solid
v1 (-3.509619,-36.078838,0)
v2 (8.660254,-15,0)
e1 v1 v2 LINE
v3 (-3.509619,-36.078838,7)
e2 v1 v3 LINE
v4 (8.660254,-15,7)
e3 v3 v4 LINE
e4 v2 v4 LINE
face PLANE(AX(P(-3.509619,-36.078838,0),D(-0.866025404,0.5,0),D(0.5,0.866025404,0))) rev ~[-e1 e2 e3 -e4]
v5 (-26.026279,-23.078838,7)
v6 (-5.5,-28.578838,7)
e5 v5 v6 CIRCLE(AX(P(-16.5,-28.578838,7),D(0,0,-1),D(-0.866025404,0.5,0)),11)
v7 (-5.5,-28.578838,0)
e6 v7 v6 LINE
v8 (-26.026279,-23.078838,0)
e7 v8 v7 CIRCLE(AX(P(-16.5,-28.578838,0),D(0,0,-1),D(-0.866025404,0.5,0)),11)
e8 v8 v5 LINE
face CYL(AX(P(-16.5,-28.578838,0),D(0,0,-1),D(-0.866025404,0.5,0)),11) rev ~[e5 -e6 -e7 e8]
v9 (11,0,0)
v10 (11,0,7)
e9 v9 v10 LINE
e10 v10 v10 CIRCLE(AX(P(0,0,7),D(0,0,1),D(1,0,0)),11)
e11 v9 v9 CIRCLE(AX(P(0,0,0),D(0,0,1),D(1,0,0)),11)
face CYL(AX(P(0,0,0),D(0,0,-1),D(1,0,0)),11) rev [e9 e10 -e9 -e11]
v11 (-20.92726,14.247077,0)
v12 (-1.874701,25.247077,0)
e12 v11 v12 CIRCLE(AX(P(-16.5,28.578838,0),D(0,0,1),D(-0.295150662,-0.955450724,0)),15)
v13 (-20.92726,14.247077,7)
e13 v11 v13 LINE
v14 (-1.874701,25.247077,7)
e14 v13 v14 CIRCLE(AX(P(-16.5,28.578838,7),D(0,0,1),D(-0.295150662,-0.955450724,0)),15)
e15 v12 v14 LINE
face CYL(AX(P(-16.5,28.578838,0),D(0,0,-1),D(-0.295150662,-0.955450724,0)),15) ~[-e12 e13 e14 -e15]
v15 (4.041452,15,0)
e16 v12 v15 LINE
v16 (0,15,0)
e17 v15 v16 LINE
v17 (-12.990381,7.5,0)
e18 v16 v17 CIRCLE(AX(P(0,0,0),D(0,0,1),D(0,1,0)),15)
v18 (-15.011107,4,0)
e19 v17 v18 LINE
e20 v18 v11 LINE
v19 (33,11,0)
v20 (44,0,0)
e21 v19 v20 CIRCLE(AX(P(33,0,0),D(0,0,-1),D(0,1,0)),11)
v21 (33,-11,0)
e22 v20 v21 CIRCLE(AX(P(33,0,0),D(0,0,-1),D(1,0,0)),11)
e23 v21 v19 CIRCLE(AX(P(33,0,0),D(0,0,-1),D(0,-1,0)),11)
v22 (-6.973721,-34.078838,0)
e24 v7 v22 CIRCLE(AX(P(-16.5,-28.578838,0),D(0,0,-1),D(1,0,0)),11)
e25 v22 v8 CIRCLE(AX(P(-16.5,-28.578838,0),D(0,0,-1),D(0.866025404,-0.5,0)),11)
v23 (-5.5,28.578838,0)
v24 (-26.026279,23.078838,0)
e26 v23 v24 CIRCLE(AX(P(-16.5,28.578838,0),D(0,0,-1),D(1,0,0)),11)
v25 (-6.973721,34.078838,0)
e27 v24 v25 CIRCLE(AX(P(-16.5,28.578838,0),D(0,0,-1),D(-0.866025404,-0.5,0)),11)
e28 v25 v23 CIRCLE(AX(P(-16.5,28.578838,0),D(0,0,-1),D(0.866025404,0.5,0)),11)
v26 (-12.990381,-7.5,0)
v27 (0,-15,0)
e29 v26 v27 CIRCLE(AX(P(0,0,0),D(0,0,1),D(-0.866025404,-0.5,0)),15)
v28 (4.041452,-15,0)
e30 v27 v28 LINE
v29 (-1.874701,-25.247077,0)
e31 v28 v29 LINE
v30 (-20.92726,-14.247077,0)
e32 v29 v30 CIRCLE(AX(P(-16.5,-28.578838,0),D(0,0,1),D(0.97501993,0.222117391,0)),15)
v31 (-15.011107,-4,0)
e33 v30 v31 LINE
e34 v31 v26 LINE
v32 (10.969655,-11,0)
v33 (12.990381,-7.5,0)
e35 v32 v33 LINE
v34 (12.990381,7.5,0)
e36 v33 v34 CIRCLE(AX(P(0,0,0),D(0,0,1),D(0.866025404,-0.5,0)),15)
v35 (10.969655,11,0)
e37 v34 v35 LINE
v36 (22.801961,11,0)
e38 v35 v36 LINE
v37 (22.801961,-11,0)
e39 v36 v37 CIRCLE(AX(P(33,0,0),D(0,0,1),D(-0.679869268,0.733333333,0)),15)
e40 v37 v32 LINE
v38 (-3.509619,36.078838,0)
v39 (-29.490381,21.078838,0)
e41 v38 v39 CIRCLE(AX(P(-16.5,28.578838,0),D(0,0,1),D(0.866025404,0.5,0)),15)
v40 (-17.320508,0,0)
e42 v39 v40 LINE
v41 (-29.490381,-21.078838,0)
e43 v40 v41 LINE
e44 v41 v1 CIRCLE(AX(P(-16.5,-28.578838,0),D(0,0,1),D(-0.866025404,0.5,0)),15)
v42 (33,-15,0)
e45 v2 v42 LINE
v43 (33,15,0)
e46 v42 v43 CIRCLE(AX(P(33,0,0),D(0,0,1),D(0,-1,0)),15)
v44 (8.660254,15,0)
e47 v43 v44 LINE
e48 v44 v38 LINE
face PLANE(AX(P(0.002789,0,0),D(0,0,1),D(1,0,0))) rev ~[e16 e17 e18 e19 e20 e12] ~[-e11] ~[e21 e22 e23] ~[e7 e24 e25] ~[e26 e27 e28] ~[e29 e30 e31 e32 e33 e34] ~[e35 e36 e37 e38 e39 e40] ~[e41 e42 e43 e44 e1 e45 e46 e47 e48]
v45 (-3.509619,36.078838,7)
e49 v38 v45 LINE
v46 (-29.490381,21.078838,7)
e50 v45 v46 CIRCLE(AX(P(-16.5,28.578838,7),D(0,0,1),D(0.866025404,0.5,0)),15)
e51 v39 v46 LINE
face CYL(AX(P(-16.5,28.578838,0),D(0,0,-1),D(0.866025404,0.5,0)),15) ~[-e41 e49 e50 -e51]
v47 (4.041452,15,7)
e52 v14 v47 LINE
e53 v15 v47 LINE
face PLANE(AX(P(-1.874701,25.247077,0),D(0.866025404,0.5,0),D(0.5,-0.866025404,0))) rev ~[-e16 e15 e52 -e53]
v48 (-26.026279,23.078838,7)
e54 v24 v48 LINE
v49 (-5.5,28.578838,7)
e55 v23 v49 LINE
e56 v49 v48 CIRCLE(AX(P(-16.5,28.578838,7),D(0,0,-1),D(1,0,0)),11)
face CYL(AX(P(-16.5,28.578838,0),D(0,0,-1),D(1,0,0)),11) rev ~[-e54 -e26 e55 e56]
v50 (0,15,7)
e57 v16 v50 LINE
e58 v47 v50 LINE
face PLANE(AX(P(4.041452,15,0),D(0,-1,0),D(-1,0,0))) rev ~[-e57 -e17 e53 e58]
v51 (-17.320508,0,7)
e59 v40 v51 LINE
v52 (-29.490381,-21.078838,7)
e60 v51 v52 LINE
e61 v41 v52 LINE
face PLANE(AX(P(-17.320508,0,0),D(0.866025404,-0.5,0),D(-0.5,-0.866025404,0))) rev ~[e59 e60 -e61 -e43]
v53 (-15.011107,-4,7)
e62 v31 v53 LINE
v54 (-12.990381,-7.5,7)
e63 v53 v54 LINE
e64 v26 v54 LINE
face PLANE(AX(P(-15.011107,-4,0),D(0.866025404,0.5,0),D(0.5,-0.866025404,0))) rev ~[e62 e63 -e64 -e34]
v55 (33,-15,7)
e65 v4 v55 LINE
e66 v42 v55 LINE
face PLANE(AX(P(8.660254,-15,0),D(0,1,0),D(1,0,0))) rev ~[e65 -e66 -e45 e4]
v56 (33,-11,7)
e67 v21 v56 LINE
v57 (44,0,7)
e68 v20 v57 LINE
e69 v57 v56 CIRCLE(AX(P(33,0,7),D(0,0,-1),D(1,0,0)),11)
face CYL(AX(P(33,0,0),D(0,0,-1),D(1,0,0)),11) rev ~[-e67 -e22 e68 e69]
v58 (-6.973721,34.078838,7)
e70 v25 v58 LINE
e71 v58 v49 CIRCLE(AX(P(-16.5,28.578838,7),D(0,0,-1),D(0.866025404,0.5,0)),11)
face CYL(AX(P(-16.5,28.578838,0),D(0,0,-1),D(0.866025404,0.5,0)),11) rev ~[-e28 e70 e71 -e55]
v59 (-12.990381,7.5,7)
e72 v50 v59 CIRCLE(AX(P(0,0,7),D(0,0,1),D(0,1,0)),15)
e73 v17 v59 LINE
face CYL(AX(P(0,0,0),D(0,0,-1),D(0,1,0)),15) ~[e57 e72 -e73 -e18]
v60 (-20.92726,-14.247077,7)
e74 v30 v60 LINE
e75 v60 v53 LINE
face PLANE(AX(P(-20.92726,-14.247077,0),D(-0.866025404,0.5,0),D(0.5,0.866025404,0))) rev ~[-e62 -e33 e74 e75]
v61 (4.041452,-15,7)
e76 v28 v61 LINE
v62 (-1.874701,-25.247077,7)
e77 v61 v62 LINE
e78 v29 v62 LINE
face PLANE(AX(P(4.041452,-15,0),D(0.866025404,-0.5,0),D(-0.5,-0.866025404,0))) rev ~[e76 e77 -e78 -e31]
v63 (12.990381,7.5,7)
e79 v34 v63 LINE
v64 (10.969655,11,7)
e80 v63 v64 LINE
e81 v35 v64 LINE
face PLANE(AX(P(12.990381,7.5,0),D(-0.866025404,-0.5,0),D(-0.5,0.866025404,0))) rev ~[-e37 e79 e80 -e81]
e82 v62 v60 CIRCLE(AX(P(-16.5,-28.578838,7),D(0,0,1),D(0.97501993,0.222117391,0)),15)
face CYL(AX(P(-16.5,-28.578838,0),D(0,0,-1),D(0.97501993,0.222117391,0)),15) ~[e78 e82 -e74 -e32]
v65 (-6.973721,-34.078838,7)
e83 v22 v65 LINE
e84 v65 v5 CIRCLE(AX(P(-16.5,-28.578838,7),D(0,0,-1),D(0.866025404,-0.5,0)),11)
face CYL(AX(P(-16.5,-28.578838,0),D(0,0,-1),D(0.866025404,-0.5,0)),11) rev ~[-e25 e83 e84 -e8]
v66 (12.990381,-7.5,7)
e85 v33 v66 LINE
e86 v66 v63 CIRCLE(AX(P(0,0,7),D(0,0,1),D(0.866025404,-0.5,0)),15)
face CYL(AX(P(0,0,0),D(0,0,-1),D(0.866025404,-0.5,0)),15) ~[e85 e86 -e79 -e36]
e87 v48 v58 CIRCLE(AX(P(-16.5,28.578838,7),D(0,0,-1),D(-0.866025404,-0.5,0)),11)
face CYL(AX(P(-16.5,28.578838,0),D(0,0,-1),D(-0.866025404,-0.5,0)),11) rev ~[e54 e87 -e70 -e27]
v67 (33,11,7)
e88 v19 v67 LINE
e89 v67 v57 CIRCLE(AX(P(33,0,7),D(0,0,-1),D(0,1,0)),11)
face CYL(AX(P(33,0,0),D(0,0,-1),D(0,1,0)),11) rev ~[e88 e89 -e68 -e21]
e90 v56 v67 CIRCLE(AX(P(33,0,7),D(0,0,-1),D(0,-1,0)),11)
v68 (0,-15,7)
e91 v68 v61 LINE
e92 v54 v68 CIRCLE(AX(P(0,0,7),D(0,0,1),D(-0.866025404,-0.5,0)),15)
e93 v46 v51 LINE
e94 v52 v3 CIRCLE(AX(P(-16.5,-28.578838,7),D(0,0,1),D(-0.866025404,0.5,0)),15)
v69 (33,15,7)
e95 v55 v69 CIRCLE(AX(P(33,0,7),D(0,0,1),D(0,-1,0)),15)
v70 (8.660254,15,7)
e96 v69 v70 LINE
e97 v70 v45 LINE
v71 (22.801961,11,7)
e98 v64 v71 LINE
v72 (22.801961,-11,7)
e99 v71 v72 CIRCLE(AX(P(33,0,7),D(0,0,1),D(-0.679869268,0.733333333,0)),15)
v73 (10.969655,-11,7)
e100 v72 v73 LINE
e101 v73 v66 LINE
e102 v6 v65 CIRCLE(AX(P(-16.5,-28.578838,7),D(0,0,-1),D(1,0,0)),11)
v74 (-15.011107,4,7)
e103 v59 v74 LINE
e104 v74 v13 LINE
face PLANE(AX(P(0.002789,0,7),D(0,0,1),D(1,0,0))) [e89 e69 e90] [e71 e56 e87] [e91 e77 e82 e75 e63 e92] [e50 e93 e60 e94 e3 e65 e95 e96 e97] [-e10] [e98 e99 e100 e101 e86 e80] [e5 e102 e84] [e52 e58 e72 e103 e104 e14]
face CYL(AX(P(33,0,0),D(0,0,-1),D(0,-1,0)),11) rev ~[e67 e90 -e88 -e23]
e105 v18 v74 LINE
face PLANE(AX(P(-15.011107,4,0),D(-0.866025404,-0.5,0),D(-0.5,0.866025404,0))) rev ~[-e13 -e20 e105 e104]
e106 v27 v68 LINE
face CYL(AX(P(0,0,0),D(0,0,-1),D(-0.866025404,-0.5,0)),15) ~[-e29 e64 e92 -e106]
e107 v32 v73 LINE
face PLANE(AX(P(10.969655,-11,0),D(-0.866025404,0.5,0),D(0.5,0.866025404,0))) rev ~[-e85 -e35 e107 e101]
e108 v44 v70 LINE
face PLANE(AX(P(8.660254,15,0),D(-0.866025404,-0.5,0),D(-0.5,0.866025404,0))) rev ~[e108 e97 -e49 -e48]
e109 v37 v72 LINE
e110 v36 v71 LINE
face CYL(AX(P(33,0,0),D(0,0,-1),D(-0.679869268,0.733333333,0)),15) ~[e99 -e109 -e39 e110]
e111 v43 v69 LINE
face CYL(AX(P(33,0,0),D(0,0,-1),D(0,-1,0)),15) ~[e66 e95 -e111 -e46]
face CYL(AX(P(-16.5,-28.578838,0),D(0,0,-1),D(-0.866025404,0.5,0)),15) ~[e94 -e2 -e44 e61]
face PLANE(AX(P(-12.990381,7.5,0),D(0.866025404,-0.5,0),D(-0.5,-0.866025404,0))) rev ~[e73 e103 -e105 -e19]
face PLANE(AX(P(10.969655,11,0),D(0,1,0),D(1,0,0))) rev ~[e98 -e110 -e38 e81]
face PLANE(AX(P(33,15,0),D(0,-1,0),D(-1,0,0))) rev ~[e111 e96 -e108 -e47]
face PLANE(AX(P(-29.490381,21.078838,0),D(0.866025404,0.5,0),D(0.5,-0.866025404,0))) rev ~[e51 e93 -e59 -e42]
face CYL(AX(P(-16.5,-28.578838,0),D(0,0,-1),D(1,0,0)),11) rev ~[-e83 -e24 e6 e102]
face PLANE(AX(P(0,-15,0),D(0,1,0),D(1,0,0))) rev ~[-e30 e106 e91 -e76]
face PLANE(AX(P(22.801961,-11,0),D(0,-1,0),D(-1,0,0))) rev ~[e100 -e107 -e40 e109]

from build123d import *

# Parameters (mm, degrees)
F0_R     = 11
F1_DEPTH = 7


# Not quite as in the source:
# - a feature names something its author has since deleted; it is built from what else it names


with BuildPart() as f1:
    # F0 (on Top) → F1 (new body)
    with BuildSketch(Plane.XY):
        with BuildLine():
            Line((-15.0111069989, -4), (-12.9903810568, -7.5))
            ThreePointArc((-12.9903810568, -7.5), (-7.5, -12.9903810568), (0, -15))
            Line((0, -15), (4.0414518843, -15))
            Line((4.0414518843, -15), (-1.8747010448, -25.2470774586))
            ThreePointArc((-1.8747010448, -25.2470774586), (-1.5939696041, -26.9024559592), (-1.5, -28.5788383249))
            ThreePointArc((-1.5, -28.5788383249), (-2.0111126057, -32.4611240014), (-3.5096189432, -36.0788383249))
            Line((-3.5096189432, -36.0788383249), (8.6602540378, -15))
            Line((8.6602540378, -15), (33, -15))
            ThreePointArc((33, -15), (27.5227744249, -13.9642400438), (22.8019609728, -11))
            Line((22.8019609728, -11), (10.9696551146, -11))
            Line((10.9696551146, -11), (12.9903810568, -7.5))
            ThreePointArc((12.9903810568, -7.5), (15, 0), (12.9903810568, 7.5))
            Line((12.9903810568, 7.5), (10.9696551146, 11))
            Line((10.9696551146, 11), (22.8019609728, 11))
            ThreePointArc((22.8019609728, 11), (27.5227744249, 13.9642400438), (33, 15))
            Line((33, 15), (8.6602540378, 15))
            Line((8.6602540378, 15), (-3.5096189432, 36.0788383249))
            ThreePointArc((-3.5096189432, 36.0788383249), (-2.0111126057, 32.4611240014), (-1.5, 28.5788383249))
            ThreePointArc((-1.5, 28.5788383249), (-1.5939696041, 26.9024559592), (-1.8747010448, 25.2470774586))
            Line((-1.8747010448, 25.2470774586), (4.0414518843, 15))
            Line((4.0414518843, 15), (0, 15))
            ThreePointArc((0, 15), (-7.5, 12.9903810568), (-12.9903810568, 7.5))
            Line((-12.9903810568, 7.5), (-15.0111069989, 4))
            Line((-15.0111069989, 4), (-20.927259928, 14.2470774586))
            ThreePointArc((-20.927259928, 14.2470774586), (-25.8547738349, 16.8533018127), (-29.4903810568, 21.0788383249))
            Line((-29.4903810568, 21.0788383249), (-17.3205080757, 0))
            Line((-17.3205080757, 0), (-29.4903810568, -21.0788383249))
            ThreePointArc((-29.4903810568, -21.0788383249), (-25.8547738349, -16.8533018127), (-20.927259928, -14.2470774586))
            Line((-20.927259928, -14.2470774586), (-15.0111069989, -4))
        make_face()
        Circle(F0_R, mode=Mode.SUBTRACT)
        with BuildLine():
            Line((-26.0262794416, -23.0788383249), (-20.927259928, -14.2470774586))
            ThreePointArc((-20.927259928, -14.2470774586), (-25.8547738349, -16.8533018127), (-29.4903810568, -21.0788383249))
            ThreePointArc((-29.4903810568, -21.0788383249), (-24, -41.5692193817), (-3.5096189432, -36.0788383249))
            ThreePointArc((-3.5096189432, -36.0788383249), (-2.0111126057, -32.4611240014), (-1.5, -28.5788383249))
            ThreePointArc((-1.5, -28.5788383249), (-1.5939696041, -26.9024559592), (-1.8747010448, -25.2470774586))
            Line((-1.8747010448, -25.2470774586), (-6.9737205584, -34.0788383249))
            ThreePointArc((-6.9737205584, -34.0788383249), (-22, -38.1051177665), (-26.0262794416, -23.0788383249))
        make_face()
        with BuildLine():
            ThreePointArc((-3.5096189432, 36.0788383249), (-24, 41.5692193817), (-29.4903810568, 21.0788383249))
            ThreePointArc((-29.4903810568, 21.0788383249), (-25.8547738349, 16.8533018127), (-20.927259928, 14.2470774586))
            Line((-20.927259928, 14.2470774586), (-26.0262794416, 23.0788383249))
            ThreePointArc((-26.0262794416, 23.0788383249), (-22, 38.1051177665), (-6.9737205584, 34.0788383249))
            Line((-6.9737205584, 34.0788383249), (-1.8747010448, 25.2470774586))
            ThreePointArc((-1.8747010448, 25.2470774586), (-1.5939696041, 26.9024559592), (-1.5, 28.5788383249))
            ThreePointArc((-1.5, 28.5788383249), (-2.0111126057, 32.4611240014), (-3.5096189432, 36.0788383249))
        make_face()
        with BuildLine():
            ThreePointArc((22.8019609728, -11), (27.5227744249, -13.9642400438), (33, -15))
            ThreePointArc((33, -15), (43.6066017178, -10.6066017178), (48, 0))
            ThreePointArc((48, 0), (43.6066017178, 10.6066017178), (33, 15))
            ThreePointArc((33, 15), (27.5227744249, 13.9642400438), (22.8019609728, 11))
            Line((22.8019609728, 11), (33, 11))
            ThreePointArc((33, 11), (40.7781745931, 7.7781745931), (44, 0))
            ThreePointArc((44, 0), (40.7781745931, -7.7781745931), (33, -11))
            Line((33, -11), (22.8019609728, -11))
        make_face()
        with BuildLine():
            ThreePointArc((22.8019609728, 11), (18, 0), (22.8019609728, -11))
            Line((22.8019609728, -11), (33, -11))
            ThreePointArc((33, -11), (22, 0), (33, 11))
            Line((33, 11), (22.8019609728, 11))
        make_face()
        with BuildLine():
            Line((-26.0262794416, 23.0788383249), (-20.927259928, 14.2470774586))
            ThreePointArc((-20.927259928, 14.2470774586), (-9, 15.5884572681), (-1.8747010448, 25.2470774586))
            Line((-1.8747010448, 25.2470774586), (-6.9737205584, 34.0788383249))
            ThreePointArc((-6.9737205584, 34.0788383249), (-5.8748159108, 31.425847821), (-5.5, 28.5788383249))
            ThreePointArc((-5.5, 28.5788383249), (-13.6529905039, 17.9536542357), (-26.0262794416, 23.0788383249))
        make_face()
        with BuildLine():
            ThreePointArc((-1.8747010448, -25.2470774586), (-9, -15.5884572681), (-20.927259928, -14.2470774586))
            Line((-20.927259928, -14.2470774586), (-26.0262794416, -23.0788383249))
            ThreePointArc((-26.0262794416, -23.0788383249), (-13.6529905039, -17.9536542357), (-5.5, -28.5788383249))
            ThreePointArc((-5.5, -28.5788383249), (-5.8748159108, -31.425847821), (-6.9737205584, -34.0788383249))
            Line((-6.9737205584, -34.0788383249), (-1.8747010448, -25.2470774586))
        make_face()
    extrude(amount=F1_DEPTH)


solid = f1.part
